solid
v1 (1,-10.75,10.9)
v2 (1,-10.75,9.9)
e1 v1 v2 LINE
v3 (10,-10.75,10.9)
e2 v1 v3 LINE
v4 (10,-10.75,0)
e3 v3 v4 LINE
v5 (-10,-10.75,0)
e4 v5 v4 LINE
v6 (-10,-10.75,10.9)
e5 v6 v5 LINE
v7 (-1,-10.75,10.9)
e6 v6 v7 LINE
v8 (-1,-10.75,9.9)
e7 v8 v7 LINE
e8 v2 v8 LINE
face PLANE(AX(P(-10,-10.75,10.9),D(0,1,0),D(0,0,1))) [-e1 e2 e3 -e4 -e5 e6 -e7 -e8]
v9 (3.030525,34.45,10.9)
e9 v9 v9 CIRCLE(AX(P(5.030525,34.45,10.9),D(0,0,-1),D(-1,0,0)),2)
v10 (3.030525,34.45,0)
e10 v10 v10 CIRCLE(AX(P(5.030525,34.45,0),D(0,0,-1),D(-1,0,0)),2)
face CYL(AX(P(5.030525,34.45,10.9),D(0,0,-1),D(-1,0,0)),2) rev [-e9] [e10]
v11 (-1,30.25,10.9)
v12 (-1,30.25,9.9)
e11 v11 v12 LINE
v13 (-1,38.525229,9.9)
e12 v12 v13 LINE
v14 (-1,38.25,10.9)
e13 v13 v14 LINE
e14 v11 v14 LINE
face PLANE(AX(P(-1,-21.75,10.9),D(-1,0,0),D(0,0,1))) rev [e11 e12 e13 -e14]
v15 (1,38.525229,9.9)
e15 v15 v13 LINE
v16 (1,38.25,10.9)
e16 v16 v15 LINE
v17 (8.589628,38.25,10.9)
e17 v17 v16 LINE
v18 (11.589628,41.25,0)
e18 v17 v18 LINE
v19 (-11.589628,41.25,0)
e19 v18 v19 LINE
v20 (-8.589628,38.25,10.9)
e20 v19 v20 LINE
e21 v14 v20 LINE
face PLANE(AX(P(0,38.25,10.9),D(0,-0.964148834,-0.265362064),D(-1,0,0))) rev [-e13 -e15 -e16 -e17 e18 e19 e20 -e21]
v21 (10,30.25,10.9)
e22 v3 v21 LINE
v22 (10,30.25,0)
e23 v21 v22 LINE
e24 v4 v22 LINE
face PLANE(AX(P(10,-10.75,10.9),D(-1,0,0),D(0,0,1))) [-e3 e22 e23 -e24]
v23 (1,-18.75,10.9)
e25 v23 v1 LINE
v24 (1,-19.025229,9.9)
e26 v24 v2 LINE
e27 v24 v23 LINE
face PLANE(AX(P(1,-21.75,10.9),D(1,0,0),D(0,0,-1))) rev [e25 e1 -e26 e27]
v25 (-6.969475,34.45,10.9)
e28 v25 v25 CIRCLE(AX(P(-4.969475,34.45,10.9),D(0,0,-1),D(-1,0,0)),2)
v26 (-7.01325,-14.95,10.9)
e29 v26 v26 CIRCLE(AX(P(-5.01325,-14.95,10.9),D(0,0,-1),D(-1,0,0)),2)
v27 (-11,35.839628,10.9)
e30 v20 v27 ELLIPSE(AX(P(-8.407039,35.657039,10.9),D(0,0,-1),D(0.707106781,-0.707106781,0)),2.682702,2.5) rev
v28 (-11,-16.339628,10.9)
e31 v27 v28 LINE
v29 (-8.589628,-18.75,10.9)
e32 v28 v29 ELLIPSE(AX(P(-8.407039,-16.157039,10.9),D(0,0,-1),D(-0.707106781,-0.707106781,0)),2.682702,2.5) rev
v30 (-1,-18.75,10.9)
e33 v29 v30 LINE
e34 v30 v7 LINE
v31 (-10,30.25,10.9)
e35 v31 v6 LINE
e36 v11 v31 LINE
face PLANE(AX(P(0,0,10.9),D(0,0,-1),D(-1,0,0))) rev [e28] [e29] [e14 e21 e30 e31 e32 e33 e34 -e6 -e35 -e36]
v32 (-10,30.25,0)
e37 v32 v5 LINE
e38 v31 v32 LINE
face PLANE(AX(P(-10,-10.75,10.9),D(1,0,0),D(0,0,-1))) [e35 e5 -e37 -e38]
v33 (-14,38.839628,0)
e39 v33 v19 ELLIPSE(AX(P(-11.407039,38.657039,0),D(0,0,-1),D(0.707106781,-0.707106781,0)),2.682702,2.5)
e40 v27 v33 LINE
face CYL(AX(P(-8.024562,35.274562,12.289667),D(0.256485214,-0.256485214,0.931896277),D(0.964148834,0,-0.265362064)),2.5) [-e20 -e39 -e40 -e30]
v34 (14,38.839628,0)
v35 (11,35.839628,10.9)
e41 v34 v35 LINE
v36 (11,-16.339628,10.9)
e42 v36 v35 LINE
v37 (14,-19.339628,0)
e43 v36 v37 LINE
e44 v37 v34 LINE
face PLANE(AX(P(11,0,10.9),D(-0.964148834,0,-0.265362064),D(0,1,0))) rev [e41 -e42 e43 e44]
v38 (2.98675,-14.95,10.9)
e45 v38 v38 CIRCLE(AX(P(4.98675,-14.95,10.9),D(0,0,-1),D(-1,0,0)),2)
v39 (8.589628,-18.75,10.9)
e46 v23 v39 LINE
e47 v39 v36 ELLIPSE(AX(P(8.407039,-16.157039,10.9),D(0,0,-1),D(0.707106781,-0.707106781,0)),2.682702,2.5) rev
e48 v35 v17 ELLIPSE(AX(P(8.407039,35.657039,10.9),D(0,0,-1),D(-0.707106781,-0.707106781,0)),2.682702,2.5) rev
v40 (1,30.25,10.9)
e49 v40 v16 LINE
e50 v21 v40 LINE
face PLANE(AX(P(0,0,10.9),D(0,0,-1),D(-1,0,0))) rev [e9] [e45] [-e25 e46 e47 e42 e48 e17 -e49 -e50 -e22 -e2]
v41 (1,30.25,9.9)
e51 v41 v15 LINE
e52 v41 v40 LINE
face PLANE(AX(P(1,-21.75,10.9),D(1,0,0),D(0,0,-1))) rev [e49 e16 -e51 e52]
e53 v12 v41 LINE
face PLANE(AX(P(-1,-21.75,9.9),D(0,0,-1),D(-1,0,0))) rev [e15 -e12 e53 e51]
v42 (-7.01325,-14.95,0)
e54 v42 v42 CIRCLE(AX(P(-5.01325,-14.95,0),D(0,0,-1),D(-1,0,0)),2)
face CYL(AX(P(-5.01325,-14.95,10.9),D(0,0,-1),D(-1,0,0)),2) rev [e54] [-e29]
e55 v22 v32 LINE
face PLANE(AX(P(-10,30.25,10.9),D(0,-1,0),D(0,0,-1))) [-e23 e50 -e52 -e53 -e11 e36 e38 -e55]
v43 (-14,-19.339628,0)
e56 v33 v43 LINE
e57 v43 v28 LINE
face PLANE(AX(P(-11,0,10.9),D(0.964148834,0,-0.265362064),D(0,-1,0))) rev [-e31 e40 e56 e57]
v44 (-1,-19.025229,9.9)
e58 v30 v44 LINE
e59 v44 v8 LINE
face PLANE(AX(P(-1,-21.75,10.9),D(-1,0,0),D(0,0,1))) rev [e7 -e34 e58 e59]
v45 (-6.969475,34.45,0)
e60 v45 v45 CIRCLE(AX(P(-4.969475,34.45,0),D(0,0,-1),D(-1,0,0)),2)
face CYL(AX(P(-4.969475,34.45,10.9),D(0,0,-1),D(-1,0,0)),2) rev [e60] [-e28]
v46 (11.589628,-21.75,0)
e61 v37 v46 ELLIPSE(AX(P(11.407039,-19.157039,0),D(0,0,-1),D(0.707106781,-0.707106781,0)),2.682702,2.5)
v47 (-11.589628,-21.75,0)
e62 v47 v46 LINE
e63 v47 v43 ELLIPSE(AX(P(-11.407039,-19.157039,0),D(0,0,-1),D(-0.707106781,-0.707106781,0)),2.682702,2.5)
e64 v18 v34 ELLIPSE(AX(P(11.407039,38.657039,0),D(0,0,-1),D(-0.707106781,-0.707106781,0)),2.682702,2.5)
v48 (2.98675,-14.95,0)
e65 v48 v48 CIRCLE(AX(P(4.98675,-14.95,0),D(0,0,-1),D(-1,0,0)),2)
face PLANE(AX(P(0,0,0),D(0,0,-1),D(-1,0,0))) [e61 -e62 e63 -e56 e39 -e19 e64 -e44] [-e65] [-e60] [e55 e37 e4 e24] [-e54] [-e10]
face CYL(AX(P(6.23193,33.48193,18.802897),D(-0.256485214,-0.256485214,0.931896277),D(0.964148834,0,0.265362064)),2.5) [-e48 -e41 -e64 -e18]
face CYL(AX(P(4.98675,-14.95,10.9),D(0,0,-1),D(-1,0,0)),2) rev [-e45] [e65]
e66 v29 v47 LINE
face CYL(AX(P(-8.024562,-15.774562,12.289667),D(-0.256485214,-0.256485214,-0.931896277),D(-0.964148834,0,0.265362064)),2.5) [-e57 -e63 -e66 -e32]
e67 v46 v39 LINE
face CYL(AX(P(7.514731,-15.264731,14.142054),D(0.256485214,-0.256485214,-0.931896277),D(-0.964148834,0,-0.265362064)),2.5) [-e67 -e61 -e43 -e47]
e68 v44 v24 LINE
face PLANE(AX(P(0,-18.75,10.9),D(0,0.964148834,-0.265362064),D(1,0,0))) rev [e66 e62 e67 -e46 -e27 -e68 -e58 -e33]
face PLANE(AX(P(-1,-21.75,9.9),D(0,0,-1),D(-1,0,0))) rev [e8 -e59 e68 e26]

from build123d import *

# Parameters (mm, degrees)
SKETCH1_W           = 28
SKETCH1_H           = 63
SKETCH1_W_2         = 20
SKETCH1_H_2         = 41
BOSS_EXTRUDE1_DEPTH = 10.9
SKETCH2_R           = 2
CUT_EXTRUDE1_DEPTH  = 45.904036567
CHAMFER1_SIZE       = 10.9
CHAMFER1_SIZE_2     = 3
SKETCH3_W           = 2
SKETCH3_H           = 1
CUT_EXTRUDE2_DEPTH  = 65.248521384
FILLET1_R           = 2.5


with BuildPart() as part:
    # Sketch1 → Boss-Extrude1 (new body)
    with BuildSketch(Plane.XY):
        with Locations((0, 9.75)):
            Rectangle(SKETCH1_W, SKETCH1_H)
        with Locations((0, 9.75)):
            Rectangle(SKETCH1_W_2, SKETCH1_H_2, mode=Mode.SUBTRACT)
    extrude(amount=BOSS_EXTRUDE1_DEPTH)

    # Sketch2 → Cut-Extrude1 (cut, through all)
    with BuildSketch(Plane(origin=(0, 0, 0), x_dir=(-1, 0, 0), z_dir=(0, 0, -1))):
        with Locations((5.013249621, -14.95)):
            Circle(SKETCH2_R)
        with Locations((-4.986750379, -14.95)):
            Circle(SKETCH2_R)
        with Locations((-5.030525248, 34.45)):
            Circle(SKETCH2_R)
        with Locations((4.969474752, 34.45)):
            Circle(SKETCH2_R)
    extrude(amount=-CUT_EXTRUDE1_DEPTH, mode=Mode.SUBTRACT)

    # Chamfer1
    # the kernel refuses this chamfer: 10.9, 3 mm, written as the material it takes off along each edge
    with BuildSketch(Plane(origin=(14, -50.052400278, 10.9), x_dir=(0.010219792224504668, 0, -0.9999477765598), z_dir=(0, 1, 0)), Plane(origin=(-14, 69.552400278, 10.9), x_dir=(-0.010219792224504668, 0, -0.9999477765598), z_dir=(0, -1, 0))) as chamfer1_piece_1:
        Polygon((CHAMFER1_SIZE * 0.99994777656, CHAMFER1_SIZE * 0.0102197922245), (-CHAMFER1_SIZE_2 * 0.0102197922245, CHAMFER1_SIZE_2 * 0.99994777656), (0, 0), align=None)
    extrude(amount=119.604800556, mode=Mode.SUBTRACT)
    with BuildSketch(Plane(origin=(-42.302400278, -21.75, 10.9), x_dir=(0, -0.010219792224504825, -0.9999477765598), z_dir=(1, 0, 0))) as chamfer1_piece_2:
        Polygon((CHAMFER1_SIZE * 0.99994777656, CHAMFER1_SIZE * 0.0102197922245), (-CHAMFER1_SIZE_2 * 0.0102197922245, CHAMFER1_SIZE_2 * 0.99994777656), (0, 0), align=None)
    extrude(amount=84.604800556, mode=Mode.SUBTRACT)
    with BuildSketch(Plane(origin=(42.302400278, 41.25, 10.9), x_dir=(0, -0.9910207476808653, 0.1337081809989902), z_dir=(-1, 0, 0))) as chamfer1_piece_3:
        Polygon((CHAMFER1_SIZE_2 * 0.991020747681, -CHAMFER1_SIZE_2 * 0.133708180999), (-CHAMFER1_SIZE * 0.133708180999, -CHAMFER1_SIZE * 0.991020747681), (0, 0), align=None)
    extrude(amount=84.604800556, mode=Mode.SUBTRACT)

    # Sketch3 → Cut-Extrude2 (cut, through all)
    with BuildSketch(Plane(origin=(0, 40, 0), x_dir=(1, 0, 0), z_dir=(0, 1, 0))):
        with Locations((0, -10.4)):
            Rectangle(SKETCH3_W, SKETCH3_H)
    extrude(amount=-CUT_EXTRUDE2_DEPTH, mode=Mode.SUBTRACT)

    # Fillet1
    fillet1_edges = [part.edges().sort_by_distance(p)[0] for p in [
        (-12.5, -20.25, 5.45),
        (-12.5, 39.75, 5.45),
        (12.5, -20.25, 5.45),
        (12.5, 39.75, 5.45),
    ]]
    fillet(fillet1_edges, radius=FILLET1_R)


solid = part.part
